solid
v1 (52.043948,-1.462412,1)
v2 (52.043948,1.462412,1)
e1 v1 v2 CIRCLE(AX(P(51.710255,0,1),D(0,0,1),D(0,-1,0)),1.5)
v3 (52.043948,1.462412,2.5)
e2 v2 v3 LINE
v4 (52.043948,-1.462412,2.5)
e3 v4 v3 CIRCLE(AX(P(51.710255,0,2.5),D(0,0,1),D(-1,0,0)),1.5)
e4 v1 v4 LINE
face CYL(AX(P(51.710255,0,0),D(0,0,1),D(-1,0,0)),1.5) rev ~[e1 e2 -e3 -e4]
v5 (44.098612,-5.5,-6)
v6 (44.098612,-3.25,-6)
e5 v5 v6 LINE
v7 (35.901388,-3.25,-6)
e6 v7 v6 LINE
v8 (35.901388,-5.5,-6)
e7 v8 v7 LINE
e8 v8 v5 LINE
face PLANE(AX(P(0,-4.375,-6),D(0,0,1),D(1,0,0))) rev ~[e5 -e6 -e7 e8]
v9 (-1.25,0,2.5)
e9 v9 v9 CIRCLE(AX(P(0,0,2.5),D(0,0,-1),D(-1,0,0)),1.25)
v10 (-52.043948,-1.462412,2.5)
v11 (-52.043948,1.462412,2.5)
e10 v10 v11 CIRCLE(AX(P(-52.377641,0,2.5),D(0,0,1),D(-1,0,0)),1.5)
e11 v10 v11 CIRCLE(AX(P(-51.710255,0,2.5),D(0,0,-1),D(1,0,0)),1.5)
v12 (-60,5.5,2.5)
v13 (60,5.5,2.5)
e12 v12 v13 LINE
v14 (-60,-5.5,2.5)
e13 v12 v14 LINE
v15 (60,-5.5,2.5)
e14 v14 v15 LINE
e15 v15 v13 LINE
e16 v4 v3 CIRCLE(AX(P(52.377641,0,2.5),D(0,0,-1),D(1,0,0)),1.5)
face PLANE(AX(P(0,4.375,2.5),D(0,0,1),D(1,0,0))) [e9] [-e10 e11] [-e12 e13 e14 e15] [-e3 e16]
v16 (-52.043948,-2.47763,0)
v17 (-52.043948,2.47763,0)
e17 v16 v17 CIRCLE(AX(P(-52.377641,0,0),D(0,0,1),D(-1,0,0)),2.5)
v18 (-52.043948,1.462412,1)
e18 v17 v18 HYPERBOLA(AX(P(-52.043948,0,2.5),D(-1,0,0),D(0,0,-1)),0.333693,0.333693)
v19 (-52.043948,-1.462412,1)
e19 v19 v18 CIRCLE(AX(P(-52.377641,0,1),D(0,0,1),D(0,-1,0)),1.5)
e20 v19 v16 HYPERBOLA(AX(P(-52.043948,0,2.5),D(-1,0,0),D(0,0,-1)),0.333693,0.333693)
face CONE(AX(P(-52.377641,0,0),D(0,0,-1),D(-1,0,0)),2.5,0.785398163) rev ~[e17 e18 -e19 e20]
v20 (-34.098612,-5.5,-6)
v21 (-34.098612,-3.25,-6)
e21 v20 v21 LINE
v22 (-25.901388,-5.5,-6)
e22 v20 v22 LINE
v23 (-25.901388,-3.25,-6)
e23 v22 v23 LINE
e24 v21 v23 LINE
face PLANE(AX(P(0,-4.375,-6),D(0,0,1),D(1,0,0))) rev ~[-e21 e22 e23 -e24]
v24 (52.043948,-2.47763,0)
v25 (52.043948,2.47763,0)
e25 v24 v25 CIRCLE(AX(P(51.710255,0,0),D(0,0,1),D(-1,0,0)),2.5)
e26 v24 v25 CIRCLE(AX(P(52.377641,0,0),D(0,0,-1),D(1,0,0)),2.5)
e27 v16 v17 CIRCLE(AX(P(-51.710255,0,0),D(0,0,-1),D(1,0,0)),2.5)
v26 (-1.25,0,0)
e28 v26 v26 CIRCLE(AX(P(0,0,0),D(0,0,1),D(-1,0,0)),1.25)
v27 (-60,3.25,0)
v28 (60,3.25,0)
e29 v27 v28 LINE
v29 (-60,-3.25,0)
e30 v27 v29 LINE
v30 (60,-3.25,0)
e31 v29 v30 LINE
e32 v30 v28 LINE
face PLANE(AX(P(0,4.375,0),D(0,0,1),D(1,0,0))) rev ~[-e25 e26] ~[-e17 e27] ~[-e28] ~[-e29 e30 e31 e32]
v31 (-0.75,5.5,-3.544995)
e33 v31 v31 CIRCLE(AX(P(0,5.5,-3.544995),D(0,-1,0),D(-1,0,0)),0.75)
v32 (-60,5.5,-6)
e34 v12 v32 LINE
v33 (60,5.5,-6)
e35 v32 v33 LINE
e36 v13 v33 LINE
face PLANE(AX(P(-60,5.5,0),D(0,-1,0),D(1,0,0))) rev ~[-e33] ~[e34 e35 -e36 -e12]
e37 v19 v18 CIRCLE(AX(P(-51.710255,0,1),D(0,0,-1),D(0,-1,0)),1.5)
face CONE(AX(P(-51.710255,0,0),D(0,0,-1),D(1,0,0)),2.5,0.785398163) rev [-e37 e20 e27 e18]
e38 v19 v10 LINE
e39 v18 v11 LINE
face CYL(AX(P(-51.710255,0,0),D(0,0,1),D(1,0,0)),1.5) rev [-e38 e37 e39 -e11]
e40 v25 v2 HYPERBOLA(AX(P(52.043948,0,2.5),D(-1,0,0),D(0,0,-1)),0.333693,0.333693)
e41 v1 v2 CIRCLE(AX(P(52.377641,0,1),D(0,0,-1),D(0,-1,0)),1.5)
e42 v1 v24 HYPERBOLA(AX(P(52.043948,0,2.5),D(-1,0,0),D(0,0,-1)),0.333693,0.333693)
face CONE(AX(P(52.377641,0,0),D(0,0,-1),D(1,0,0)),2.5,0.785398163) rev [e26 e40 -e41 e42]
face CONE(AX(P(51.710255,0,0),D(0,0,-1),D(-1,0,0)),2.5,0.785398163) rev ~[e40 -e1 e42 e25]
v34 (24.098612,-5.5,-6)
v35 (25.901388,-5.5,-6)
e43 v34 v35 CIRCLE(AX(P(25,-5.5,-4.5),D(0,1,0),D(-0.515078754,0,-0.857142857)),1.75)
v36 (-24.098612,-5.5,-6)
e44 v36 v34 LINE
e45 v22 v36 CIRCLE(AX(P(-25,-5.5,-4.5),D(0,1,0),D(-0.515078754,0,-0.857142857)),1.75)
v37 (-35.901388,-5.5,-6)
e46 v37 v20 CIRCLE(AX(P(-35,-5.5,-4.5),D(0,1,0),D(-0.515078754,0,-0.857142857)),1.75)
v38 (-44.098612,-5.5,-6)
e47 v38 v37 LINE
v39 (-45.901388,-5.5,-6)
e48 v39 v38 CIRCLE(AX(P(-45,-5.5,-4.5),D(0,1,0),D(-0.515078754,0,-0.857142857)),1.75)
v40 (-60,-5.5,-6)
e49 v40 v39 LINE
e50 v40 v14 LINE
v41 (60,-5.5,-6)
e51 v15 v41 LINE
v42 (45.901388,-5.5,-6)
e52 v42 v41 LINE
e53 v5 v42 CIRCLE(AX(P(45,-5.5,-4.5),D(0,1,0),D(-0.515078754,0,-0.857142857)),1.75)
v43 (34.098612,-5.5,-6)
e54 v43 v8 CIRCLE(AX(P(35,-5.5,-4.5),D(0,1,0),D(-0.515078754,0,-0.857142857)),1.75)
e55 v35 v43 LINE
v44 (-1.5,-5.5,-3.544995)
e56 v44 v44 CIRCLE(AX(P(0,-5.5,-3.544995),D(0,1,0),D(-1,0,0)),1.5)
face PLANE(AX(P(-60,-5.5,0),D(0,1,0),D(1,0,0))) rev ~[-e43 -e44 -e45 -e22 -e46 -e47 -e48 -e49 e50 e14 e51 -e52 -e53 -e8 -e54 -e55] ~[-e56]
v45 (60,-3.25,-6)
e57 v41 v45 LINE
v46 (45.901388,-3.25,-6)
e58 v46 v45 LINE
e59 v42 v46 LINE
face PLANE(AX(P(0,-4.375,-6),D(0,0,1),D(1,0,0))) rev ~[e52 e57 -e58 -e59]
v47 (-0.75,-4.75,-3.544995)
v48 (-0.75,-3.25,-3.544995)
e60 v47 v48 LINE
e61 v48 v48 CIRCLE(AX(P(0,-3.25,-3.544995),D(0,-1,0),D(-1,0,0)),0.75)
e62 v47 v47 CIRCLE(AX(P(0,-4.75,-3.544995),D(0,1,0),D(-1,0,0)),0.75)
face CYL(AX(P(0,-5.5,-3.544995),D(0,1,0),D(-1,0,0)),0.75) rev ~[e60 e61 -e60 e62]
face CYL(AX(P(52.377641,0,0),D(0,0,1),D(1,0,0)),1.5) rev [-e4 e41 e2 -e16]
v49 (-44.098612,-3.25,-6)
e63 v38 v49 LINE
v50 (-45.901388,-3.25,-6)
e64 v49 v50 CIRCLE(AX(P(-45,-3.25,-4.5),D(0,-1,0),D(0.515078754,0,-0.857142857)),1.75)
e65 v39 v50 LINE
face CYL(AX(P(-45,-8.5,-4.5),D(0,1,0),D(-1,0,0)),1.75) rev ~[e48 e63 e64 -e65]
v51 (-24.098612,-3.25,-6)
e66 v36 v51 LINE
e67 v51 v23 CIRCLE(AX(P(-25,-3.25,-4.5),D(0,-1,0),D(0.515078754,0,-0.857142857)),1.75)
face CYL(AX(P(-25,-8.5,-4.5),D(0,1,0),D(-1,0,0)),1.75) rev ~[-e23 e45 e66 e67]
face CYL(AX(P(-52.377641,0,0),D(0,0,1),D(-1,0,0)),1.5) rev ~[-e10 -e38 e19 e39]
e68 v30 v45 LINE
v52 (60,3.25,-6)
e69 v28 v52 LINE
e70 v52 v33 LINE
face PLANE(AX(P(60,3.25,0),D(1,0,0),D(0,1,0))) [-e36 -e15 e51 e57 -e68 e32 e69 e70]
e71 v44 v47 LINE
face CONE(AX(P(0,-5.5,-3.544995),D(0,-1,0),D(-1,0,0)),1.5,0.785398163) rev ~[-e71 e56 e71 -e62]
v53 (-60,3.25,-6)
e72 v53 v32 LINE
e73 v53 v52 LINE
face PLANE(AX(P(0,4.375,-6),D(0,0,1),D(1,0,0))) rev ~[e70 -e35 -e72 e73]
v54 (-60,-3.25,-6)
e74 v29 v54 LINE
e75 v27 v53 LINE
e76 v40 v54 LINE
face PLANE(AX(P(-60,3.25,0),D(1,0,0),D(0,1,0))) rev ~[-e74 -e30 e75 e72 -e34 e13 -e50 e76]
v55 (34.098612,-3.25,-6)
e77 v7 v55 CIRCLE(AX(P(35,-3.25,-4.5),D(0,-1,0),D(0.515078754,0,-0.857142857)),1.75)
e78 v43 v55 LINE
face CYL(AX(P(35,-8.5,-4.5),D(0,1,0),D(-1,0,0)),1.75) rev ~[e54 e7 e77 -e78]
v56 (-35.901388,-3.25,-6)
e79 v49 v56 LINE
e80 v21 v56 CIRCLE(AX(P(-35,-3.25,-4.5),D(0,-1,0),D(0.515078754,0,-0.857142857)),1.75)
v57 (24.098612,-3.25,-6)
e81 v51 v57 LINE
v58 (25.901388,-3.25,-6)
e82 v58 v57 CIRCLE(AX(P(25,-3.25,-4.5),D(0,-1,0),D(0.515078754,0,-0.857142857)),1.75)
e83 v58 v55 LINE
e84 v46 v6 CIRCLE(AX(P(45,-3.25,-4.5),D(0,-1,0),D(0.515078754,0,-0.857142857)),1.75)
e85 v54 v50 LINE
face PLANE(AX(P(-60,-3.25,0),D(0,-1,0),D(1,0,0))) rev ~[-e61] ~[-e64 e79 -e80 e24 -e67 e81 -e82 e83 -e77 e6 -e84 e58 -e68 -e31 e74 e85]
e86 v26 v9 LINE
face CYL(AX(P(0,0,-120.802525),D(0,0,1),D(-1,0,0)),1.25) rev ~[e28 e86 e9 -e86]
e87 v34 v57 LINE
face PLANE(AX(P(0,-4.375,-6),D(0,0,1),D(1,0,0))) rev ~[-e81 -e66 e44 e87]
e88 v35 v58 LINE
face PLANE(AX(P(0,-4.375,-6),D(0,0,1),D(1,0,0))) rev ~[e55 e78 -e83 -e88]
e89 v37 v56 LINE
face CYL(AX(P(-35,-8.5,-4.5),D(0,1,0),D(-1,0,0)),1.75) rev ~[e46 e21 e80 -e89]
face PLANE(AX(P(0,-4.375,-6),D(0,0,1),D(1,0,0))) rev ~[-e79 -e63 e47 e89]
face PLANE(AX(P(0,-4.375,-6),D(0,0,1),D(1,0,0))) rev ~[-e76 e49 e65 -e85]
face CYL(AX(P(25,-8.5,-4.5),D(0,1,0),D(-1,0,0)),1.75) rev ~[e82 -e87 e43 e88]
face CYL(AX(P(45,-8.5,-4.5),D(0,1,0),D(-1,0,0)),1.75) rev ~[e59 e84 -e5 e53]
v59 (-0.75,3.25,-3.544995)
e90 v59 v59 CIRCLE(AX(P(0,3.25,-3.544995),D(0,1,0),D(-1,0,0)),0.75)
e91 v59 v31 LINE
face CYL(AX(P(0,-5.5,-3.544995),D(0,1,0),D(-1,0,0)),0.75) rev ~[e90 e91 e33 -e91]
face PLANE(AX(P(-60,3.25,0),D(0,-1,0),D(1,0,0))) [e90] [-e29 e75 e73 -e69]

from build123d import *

# Parameters (mm, degrees)
F0_W            = 120
F0_H            = 2.25
F0_H_2          = 6.5
F1_DEPTH        = 2.5
F2_DEPTH        = 6
F6_D            = 3
F6_CSINK_D      = 5
F6_CSINK_ANGLE  = 90
F7_D            = 2.5
F8_D            = 3.5
F8_DEPTH        = 3
F8_TIP          = 1.0515060833
F10_D           = 1.5
F10_CSINK_D     = 3
F10_CSINK_ANGLE = 90


# Not quite as in the source:
# - a feature names something its author has since deleted; it is built from what else it names


with BuildPart() as f1:
    # F0 (on Top) → F1 (new body)
    with BuildSketch(Plane.XY):
        with Locations((0, 4.375)):
            Rectangle(F0_W, F0_H)
        Rectangle(F0_W, F0_H_2)
        with Locations((0, -4.375)):
            Rectangle(F0_W, F0_H)
    extrude(amount=F1_DEPTH)

    # F0 (on Top) → F2 (join)
    with BuildSketch(Plane.XY):
        with Locations((0, 4.375)):
            Rectangle(F0_W, F0_H)
        with Locations((0, -4.375)):
            Rectangle(F0_W, F0_H)
    extrude(amount=-F2_DEPTH)

    # F6 (through all)
    with Locations(Plane(origin=(0, 0, 0), x_dir=(1, 0, 0), z_dir=(0, 0, -1))):
        with Locations((-52.377641201, 0), (51.710255444, 0)):
            CounterSinkHole(F6_D / 2, F6_CSINK_D / 2, counter_sink_angle=F6_CSINK_ANGLE)

    # F7 (through all)
    with Locations(Plane(origin=(0, 0, 0), x_dir=(1, 0, 0), z_dir=(0, 0, -1))):
        with Locations((0, 0)):
            Hole(F7_D / 2)

    # F8
    with Locations(Plane.XZ.offset(5.5)):
        with Locations((-45, -4.5), (-35, -4.5), (-25, -4.5), (25, -4.5), (35, -4.5), (45, -4.5)):
            Hole(F8_D / 2, depth=F8_DEPTH)
            with Locations((0, 0, -(F8_DEPTH + F8_TIP / 2))):  # 118° drill point
                Cone(0, F8_D / 2, F8_TIP, mode=Mode.SUBTRACT)

    # F10 (through all)
    with Locations(Plane.XZ.offset(5.5)):
        with Locations((0, -3.5449948628)):
            CounterSinkHole(F10_D / 2, F10_CSINK_D / 2, counter_sink_angle=F10_CSINK_ANGLE)

    # F11: F1 across plane


with BuildPart() as f1_1:
    add(f1.part)
    add(f1.part.mirror(Plane.YZ))


solid = f1_1.part
